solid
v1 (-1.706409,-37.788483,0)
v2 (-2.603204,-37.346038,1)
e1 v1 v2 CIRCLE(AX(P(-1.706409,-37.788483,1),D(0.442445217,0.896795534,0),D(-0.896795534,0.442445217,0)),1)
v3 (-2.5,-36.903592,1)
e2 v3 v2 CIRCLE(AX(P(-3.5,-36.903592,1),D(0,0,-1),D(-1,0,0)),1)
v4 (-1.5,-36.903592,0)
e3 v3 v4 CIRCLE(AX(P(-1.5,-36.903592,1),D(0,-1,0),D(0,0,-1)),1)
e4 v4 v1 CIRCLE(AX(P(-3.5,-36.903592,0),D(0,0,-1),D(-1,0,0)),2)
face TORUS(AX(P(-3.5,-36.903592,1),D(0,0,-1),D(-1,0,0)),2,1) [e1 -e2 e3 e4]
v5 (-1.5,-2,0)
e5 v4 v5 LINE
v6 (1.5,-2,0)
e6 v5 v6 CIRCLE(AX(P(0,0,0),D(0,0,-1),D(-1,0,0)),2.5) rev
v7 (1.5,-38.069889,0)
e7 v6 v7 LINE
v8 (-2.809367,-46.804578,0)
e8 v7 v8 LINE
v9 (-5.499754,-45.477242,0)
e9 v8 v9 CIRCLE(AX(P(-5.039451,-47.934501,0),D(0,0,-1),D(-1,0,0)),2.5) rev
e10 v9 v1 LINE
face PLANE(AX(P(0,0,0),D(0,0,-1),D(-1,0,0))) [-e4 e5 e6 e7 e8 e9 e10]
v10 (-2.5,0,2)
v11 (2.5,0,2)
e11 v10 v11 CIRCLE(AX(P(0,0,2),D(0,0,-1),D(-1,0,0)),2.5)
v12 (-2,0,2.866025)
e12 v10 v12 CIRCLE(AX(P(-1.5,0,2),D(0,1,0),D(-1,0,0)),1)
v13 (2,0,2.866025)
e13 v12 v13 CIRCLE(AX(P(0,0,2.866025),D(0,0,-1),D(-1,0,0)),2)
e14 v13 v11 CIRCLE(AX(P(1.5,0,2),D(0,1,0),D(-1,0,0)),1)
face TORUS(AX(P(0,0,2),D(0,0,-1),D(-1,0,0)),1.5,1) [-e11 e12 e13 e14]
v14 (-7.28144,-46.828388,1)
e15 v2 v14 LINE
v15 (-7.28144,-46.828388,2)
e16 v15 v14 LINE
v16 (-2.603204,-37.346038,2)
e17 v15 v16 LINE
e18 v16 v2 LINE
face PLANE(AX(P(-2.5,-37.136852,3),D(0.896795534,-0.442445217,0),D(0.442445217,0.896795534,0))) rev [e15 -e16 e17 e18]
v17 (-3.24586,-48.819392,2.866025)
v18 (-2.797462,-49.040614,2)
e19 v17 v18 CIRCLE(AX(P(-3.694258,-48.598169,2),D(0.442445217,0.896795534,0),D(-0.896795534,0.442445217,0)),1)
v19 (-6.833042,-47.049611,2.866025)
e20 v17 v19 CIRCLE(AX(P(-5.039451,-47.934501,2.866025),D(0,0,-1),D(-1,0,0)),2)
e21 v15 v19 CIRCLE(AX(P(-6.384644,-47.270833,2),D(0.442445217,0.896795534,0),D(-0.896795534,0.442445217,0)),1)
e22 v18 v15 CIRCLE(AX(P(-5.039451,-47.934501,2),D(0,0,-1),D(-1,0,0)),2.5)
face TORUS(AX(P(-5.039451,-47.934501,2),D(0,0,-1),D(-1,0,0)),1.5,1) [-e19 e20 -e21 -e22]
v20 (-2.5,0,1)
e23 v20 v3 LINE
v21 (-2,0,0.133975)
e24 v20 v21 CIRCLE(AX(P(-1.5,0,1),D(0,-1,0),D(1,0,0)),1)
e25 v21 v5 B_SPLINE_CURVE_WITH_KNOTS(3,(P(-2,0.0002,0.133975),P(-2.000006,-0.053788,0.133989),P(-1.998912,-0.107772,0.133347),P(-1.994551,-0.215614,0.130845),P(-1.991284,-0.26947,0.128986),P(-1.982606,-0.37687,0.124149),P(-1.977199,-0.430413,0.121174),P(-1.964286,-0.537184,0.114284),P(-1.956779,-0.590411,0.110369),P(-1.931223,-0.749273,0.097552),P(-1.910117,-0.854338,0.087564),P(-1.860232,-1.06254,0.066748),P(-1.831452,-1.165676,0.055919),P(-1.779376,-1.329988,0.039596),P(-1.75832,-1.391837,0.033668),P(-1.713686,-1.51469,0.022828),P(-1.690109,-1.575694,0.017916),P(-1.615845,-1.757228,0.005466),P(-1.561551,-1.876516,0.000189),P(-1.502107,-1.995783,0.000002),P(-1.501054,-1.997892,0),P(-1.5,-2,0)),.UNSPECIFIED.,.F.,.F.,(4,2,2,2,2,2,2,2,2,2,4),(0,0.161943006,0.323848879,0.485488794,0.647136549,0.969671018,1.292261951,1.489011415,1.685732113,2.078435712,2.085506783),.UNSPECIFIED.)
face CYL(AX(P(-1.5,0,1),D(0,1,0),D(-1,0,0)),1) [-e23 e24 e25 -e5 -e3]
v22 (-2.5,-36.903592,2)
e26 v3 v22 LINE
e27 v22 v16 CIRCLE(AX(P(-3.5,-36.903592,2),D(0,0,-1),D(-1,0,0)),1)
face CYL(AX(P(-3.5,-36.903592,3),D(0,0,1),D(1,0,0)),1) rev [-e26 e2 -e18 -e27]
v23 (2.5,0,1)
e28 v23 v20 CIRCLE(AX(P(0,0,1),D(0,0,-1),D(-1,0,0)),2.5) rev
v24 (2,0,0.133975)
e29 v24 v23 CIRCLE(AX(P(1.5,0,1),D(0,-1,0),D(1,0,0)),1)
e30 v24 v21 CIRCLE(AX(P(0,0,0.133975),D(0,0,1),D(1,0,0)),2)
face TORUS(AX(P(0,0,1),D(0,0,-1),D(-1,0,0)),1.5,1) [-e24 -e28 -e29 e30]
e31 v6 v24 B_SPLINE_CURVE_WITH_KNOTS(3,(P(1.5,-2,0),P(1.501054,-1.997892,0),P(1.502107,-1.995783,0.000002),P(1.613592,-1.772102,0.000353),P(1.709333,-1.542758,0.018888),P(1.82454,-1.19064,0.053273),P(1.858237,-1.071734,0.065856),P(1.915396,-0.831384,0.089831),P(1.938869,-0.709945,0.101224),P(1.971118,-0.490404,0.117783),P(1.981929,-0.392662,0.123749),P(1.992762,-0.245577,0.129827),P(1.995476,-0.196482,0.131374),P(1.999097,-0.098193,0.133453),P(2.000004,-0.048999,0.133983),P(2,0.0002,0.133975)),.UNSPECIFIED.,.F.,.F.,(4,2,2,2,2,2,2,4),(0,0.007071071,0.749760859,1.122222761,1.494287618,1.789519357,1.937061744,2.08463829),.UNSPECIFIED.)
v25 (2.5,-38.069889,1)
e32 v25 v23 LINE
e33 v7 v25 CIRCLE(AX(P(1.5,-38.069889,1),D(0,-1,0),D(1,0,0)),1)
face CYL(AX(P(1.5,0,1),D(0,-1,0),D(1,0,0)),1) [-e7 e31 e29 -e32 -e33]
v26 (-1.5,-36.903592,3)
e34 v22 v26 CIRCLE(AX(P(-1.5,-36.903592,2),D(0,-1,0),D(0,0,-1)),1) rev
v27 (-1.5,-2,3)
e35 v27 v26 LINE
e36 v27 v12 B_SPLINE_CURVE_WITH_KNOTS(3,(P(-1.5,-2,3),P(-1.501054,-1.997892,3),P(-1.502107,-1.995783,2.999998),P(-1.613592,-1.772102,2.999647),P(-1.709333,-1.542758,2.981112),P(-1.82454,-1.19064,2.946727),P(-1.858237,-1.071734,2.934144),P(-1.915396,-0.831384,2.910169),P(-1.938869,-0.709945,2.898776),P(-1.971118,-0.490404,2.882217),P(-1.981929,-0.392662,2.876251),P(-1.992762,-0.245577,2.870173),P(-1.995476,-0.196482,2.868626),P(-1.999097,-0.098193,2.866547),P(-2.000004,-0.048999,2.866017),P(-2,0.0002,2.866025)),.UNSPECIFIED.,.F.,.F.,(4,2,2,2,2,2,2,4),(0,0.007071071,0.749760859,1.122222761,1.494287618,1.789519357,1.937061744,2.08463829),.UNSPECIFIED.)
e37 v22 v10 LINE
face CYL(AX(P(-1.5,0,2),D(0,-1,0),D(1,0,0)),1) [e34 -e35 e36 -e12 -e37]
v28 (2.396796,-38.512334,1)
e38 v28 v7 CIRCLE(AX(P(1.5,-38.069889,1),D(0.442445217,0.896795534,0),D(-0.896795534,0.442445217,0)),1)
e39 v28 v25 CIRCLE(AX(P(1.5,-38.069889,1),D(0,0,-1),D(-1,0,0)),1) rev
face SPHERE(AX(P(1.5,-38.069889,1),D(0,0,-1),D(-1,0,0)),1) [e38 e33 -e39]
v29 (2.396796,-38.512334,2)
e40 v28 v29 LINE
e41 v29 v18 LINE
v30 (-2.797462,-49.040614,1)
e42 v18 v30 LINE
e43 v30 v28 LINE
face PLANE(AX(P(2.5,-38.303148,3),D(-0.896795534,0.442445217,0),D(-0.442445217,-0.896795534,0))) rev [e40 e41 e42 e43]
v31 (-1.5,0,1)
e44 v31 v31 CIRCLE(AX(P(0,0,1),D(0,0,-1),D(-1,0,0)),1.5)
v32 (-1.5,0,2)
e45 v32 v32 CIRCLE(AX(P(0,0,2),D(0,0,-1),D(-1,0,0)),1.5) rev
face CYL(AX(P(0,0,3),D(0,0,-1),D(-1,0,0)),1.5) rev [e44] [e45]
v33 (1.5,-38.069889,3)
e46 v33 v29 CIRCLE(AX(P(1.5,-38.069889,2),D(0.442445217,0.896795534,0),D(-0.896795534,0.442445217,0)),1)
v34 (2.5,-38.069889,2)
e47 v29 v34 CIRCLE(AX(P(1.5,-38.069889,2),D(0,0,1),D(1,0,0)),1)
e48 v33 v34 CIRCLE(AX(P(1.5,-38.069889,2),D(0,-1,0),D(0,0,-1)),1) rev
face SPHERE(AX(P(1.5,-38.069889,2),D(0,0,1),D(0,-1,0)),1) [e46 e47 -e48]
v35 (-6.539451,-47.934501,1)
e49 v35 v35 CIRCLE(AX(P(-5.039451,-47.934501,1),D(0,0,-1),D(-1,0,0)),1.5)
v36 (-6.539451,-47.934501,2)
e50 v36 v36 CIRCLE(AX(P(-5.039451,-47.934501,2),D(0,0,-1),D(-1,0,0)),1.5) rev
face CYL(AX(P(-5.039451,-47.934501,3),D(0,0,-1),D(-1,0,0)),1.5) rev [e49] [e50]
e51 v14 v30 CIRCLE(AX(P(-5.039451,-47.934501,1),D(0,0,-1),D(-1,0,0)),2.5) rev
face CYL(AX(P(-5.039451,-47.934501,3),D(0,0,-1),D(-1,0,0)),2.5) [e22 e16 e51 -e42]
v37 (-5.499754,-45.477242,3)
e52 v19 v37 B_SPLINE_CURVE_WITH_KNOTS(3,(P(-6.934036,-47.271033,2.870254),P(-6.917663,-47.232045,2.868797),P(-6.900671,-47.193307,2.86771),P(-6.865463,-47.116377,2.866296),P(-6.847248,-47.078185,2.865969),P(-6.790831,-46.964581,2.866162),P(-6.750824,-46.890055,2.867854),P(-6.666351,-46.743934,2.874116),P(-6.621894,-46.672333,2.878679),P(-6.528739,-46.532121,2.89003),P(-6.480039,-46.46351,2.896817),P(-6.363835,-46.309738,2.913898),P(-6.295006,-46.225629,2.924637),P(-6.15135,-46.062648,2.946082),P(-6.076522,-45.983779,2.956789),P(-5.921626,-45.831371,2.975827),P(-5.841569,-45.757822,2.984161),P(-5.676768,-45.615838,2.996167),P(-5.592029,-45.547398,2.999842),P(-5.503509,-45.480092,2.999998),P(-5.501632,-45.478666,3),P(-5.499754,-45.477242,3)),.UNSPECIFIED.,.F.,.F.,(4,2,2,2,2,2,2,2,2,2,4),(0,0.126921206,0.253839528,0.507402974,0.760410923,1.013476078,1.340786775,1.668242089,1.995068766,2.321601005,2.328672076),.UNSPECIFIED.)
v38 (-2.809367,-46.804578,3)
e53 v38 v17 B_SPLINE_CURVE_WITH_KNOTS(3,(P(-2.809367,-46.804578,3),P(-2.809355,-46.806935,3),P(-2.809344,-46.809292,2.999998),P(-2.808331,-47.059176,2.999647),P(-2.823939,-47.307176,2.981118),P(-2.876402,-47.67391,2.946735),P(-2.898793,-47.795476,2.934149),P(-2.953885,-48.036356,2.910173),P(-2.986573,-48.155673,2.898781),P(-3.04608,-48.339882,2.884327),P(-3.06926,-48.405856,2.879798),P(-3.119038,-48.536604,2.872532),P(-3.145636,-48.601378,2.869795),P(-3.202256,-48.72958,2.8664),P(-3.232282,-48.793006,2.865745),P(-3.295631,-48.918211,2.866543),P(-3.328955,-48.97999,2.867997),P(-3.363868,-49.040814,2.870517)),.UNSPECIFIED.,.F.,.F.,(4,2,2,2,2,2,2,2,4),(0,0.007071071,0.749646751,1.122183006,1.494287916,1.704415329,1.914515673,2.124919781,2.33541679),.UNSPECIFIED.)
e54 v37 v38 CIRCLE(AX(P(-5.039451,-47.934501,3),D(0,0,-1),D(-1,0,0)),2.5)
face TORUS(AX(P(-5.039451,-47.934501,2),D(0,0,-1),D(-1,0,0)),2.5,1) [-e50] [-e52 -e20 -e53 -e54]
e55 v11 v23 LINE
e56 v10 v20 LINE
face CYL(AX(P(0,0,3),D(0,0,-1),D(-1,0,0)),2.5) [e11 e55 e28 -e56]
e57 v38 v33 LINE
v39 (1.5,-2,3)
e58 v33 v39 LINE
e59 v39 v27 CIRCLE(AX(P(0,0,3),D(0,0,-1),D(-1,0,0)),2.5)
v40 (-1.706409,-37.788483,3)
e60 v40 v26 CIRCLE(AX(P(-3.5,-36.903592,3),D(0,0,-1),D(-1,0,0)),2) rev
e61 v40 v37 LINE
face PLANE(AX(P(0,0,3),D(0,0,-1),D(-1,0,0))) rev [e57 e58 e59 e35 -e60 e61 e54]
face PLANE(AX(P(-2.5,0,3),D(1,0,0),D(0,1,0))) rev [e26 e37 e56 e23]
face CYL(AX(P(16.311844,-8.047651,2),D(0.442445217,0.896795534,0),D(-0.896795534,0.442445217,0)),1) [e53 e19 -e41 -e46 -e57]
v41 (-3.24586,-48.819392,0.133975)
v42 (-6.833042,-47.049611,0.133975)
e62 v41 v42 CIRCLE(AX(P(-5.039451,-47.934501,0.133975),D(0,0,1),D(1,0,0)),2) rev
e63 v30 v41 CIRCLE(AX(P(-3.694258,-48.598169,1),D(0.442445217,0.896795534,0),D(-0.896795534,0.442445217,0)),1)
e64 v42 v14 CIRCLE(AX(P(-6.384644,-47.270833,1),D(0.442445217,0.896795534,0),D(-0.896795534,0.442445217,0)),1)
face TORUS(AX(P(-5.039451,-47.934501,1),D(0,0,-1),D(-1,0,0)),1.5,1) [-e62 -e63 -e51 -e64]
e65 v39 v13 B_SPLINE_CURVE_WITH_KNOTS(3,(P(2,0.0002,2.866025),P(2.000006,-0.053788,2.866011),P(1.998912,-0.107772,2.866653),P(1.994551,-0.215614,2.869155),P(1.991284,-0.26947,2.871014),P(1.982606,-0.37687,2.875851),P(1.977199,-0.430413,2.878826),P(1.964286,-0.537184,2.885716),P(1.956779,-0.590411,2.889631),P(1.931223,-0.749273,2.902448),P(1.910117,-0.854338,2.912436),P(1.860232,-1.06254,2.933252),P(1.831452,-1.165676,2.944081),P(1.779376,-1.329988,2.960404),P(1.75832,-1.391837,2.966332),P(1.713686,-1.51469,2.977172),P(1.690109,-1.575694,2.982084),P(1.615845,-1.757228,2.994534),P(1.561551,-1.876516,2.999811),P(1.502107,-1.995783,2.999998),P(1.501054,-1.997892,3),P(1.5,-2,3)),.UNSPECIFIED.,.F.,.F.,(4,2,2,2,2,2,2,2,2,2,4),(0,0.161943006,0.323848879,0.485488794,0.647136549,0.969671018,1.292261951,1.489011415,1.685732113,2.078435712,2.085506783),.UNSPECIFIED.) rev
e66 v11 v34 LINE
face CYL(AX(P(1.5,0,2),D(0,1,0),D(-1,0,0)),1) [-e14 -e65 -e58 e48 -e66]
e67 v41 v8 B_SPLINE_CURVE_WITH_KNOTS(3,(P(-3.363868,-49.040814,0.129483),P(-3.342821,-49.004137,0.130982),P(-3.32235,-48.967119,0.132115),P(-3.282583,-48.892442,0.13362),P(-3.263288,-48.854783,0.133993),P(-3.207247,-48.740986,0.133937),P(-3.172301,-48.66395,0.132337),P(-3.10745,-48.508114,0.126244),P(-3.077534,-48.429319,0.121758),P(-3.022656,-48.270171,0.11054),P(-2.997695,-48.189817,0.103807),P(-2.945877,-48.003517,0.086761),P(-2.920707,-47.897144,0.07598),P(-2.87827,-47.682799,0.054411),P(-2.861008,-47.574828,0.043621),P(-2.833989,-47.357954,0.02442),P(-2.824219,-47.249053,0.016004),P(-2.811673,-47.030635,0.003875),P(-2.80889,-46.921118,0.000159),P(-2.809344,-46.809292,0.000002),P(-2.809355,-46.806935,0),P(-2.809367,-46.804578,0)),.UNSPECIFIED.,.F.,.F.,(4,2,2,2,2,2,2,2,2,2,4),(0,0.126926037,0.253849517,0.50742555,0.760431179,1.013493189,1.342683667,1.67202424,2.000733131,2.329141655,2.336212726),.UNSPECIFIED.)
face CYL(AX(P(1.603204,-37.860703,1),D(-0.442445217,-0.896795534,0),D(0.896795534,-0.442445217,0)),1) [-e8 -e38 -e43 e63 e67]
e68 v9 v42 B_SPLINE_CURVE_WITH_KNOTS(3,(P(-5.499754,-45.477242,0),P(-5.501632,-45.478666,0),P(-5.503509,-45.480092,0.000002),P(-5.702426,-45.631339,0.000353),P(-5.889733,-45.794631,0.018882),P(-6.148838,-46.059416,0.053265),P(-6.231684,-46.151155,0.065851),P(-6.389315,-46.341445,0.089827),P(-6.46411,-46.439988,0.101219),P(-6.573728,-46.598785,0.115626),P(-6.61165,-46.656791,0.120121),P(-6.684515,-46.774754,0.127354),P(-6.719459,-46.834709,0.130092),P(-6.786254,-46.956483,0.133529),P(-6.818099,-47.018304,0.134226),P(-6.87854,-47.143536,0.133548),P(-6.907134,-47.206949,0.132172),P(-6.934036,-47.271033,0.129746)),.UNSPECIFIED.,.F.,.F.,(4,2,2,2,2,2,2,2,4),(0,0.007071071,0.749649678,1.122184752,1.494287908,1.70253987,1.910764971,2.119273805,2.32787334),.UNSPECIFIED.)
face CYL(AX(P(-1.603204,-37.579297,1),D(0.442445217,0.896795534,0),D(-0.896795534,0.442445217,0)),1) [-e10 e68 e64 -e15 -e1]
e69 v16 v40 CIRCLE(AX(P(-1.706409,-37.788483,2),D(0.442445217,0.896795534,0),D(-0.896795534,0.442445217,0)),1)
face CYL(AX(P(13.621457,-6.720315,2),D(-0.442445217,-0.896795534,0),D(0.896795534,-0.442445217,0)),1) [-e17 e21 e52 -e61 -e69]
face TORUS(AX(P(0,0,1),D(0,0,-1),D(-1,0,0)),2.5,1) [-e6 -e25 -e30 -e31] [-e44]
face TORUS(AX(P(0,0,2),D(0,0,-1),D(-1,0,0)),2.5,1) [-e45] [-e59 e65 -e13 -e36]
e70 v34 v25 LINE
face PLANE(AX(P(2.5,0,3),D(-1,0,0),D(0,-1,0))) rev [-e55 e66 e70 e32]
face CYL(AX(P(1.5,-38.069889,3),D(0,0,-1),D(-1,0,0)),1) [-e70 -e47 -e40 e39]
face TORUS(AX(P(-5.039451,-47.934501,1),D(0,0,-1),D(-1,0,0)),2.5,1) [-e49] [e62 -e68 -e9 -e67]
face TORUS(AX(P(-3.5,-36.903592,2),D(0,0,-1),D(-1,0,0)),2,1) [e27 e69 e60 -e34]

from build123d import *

# Parameters (mm, degrees)
SKETCH1_R           = 1.5
BOSS_EXTRUDE1_DEPTH = 3
FILLET1_R           = 1


with BuildPart() as part:
    # Sketch1 → Boss-Extrude1 (new body)
    with BuildSketch(Plane.XY):
        with BuildLine():
            Line((-2.5, 0), (-2.5, -37.136851725))
            Line((-2.5, -37.136851725), (-7.28143986, -46.828388088))
            ThreePointArc((-7.28143986, -46.828388088), (-6.145564068, -50.176489966), (-2.79746219, -49.040614175))
            Line((-2.79746219, -49.040614175), (2.5, -38.303148275))
            Line((2.5, -38.303148275), (2.5, 0))
            ThreePointArc((2.5, 0), (0, 2.5), (-2.5, 0))
        make_face()
        Circle(SKETCH1_R, mode=Mode.SUBTRACT)
        with Locations((-5.039451025, -47.934501132)):
            Circle(SKETCH1_R, mode=Mode.SUBTRACT)
    extrude(amount=BOSS_EXTRUDE1_DEPTH)

    # Fillet1
    # the kernel refuses this fillet: 1 mm, written as the material it adds along each edge
    with BuildSketch(Plane(origin=(-2.5, -37.136851725, 0), x_dir=(0, 1, 0), z_dir=(0, 0, 1))) as fillet1_piece_1:
        with BuildLine():
            CenterArc((FILLET1_R * 0.23325930992, FILLET1_R), FILLET1_R, 243.74, 26.26)
            Line((-FILLET1_R * 0.209185907385, FILLET1_R * 0.103204466066), (0, 0))
            Line((0, 0), (FILLET1_R * 0.23325930992, 0))
        make_face()
    extrude(amount=3)
    # the kernel refuses this fillet: 1 mm, written as the material it takes off along each edge
    with BuildSketch(Plane(origin=(1.5, -38.069888965, 2), x_dir=(0.8967955339340403, -0.44244521730487674, 0), z_dir=(0, 0, 1))) as fillet1_2_piece_1_section:
        Polygon((0, 0), (FILLET1_R, 0), (FILLET1_R, FILLET1_R * 0.23325930992), (FILLET1_R * 0.896795533934, FILLET1_R * 0.442445217305), align=None)
    fillet1_2_piece_1 = extrude(amount=FILLET1_R, mode=Mode.PRIVATE)
    fillet1_2_piece_1 = fillet1_2_piece_1 - Plane(origin=(1.5, -38.069888965, 2), x_dir=(-0.9738571594268947, 0.22716124896861223, 0), z_dir=(0, 0, 1)) * Sphere(FILLET1_R, mode=Mode.PRIVATE)
    add(fillet1_2_piece_1, mode=Mode.SUBTRACT)
    with BuildSketch(Plane(origin=(1.5, -38.069888965, 1), x_dir=(0.8967955339340403, -0.44244521730487674, 0), z_dir=(0, 0, -1))) as fillet1_2_piece_2_section:
        Polygon((0, 0), (FILLET1_R, 0), (FILLET1_R, -FILLET1_R * 0.23325930992), (FILLET1_R * 0.896795533934, -FILLET1_R * 0.442445217305), align=None)
    fillet1_2_piece_2 = extrude(amount=FILLET1_R, mode=Mode.PRIVATE)
    fillet1_2_piece_2 = fillet1_2_piece_2 - Plane(origin=(1.5, -38.069888965, 1), x_dir=(-0.9738571594268947, 0.22716124896861223, 0), z_dir=(0, 0, -1)) * Sphere(FILLET1_R, mode=Mode.PRIVATE)
    add(fillet1_2_piece_2, mode=Mode.SUBTRACT)
    with BuildSketch(Plane(origin=(0, 0, 3), x_dir=(1, 0, 0), z_dir=(0, -1, 0))) as fillet1_2_piece_3:
        with BuildLine():
            CenterArc((2.5 - FILLET1_R, -FILLET1_R), FILLET1_R, 0, 90)
            Line((2.5, -FILLET1_R), (2.5, 0))
            Line((2.5, 0), (2.5 - FILLET1_R, 0))
        make_face()
    revolve(axis=Axis((0, 0, 3), (0, 0, 1)), revolution_arc=180, mode=Mode.SUBTRACT)
    with BuildSketch(Plane(origin=(0, 0, 0), x_dir=(1, 0, 0), z_dir=(0, -1, 0))) as fillet1_2_piece_4:
        with BuildLine():
            CenterArc((2.5 - FILLET1_R, FILLET1_R), FILLET1_R, 270, 90)
            Line((2.5, FILLET1_R), (2.5, 0))
            Line((2.5, 0), (2.5 - FILLET1_R, 0))
        make_face()
    revolve(axis=Axis((0, 0, 0), (0, 0, 1)), revolution_arc=180, mode=Mode.SUBTRACT)
    with BuildSketch(Plane(origin=(-2.5, 0, 3), x_dir=(0, 0, -1), z_dir=(0, -1, 0))) as fillet1_2_piece_5:
        with BuildLine():
            CenterArc((FILLET1_R, FILLET1_R), FILLET1_R, 180, 90)
            Line((0, FILLET1_R), (0, 0))
            Line((0, 0), (FILLET1_R, 0))
        make_face()
    extrude(amount=36.903592415, mode=Mode.SUBTRACT)
    with BuildSketch(Plane(origin=(-2.5, 0, 0), x_dir=(0, 0, 1), z_dir=(0, -1, 0))) as fillet1_2_piece_6:
        with BuildLine():
            CenterArc((FILLET1_R, -FILLET1_R), FILLET1_R, 90, 90)
            Line((0, -FILLET1_R), (0, 0))
            Line((0, 0), (FILLET1_R, 0))
        make_face()
    extrude(amount=36.903592415, mode=Mode.SUBTRACT)
    with BuildSketch(Plane(origin=(-2.603204466, -37.346037633, 3), x_dir=(0.8967955339340403, -0.4424452173048767, 0), z_dir=(-0.4424452173048767, -0.8967955339340403, 0))) as fillet1_2_piece_7:
        with BuildLine():
            CenterArc((FILLET1_R, -FILLET1_R), FILLET1_R, 90, 90)
            Line((0, -FILLET1_R), (0, 0))
            Line((0, 0), (FILLET1_R, 0))
        make_face()
    extrude(amount=10.573592415, mode=Mode.SUBTRACT)
    with BuildSketch(Plane(origin=(-2.603204466, -37.346037633, 0), x_dir=(0.8967955339340403, -0.4424452173048767, 0), z_dir=(-0.4424452173048767, -0.8967955339340403, 0))) as fillet1_2_piece_8:
        with BuildLine():
            CenterArc((FILLET1_R, FILLET1_R), FILLET1_R, 180, 90)
            Line((0, FILLET1_R), (0, 0))
            Line((0, 0), (FILLET1_R, 0))
        make_face()
    extrude(amount=10.573592415, mode=Mode.SUBTRACT)
    with BuildSketch(Plane(origin=(-5.039451025, -47.934501132, 3), x_dir=(-0.8967955339340404, 0.44244521730487624, 0), z_dir=(0.44244521730487624, 0.8967955339340404, 0))) as fillet1_2_piece_9:
        with BuildLine():
            CenterArc((2.5 - FILLET1_R, -FILLET1_R), FILLET1_R, 0, 90)
            Line((2.5, -FILLET1_R), (2.5, 0))
            Line((2.5, 0), (2.5 - FILLET1_R, 0))
        make_face()
    revolve(axis=Axis((-5.039451025, -47.934501132, 3), (0, 0, 1)), revolution_arc=180, mode=Mode.SUBTRACT)
    with BuildSketch(Plane(origin=(-5.039451025, -47.934501132, 0), x_dir=(-0.8967955339340404, 0.44244521730487624, 0), z_dir=(0.44244521730487624, 0.8967955339340404, 0))) as fillet1_2_piece_10:
        with BuildLine():
            CenterArc((2.5 - FILLET1_R, FILLET1_R), FILLET1_R, 270, 90)
            Line((2.5, FILLET1_R), (2.5, 0))
            Line((2.5, 0), (2.5 - FILLET1_R, 0))
        make_face()
    revolve(axis=Axis((-5.039451025, -47.934501132, 0), (0, 0, 1)), revolution_arc=180, mode=Mode.SUBTRACT)
    with BuildSketch(Plane(origin=(-2.79746219, -49.040614175, 3), x_dir=(-0.8967955339340403, 0.44244521730487674, 0), z_dir=(0.44244521730487674, 0.8967955339340403, 0))) as fillet1_2_piece_11:
        with BuildLine():
            CenterArc((FILLET1_R, -FILLET1_R), FILLET1_R, 90, 90)
            Line((0, -FILLET1_R), (0, 0))
            Line((0, 0), (FILLET1_R, 0))
        make_face()
    extrude(amount=11.739888965, mode=Mode.SUBTRACT)
    with BuildSketch(Plane(origin=(-2.79746219, -49.040614175, 0), x_dir=(-0.8967955339340403, 0.44244521730487674, 0), z_dir=(0.44244521730487674, 0.8967955339340403, 0))) as fillet1_2_piece_12:
        with BuildLine():
            CenterArc((FILLET1_R, FILLET1_R), FILLET1_R, 180, 90)
            Line((0, FILLET1_R), (0, 0))
            Line((0, 0), (FILLET1_R, 0))
        make_face()
    extrude(amount=11.739888965, mode=Mode.SUBTRACT)
    with BuildSketch(Plane(origin=(2.5, -38.303148275, 1), x_dir=(-0.4424452173048793, -0.896795533934039, 0), z_dir=(0, 0, 1))) as fillet1_2_piece_13:
        with BuildLine():
            CenterArc((FILLET1_R * 0.23325930992, -FILLET1_R), FILLET1_R, 90, 26.26)
            Line((-FILLET1_R * 0.209185907385, -FILLET1_R * 0.103204466066), (0, 0))
            Line((0, 0), (FILLET1_R * 0.23325930992, 0))
        make_face()
    extrude(amount=1, mode=Mode.SUBTRACT)
    with BuildSketch(Plane(origin=(2.5, -38.069888965, 3), x_dir=(-1, 0, 0), z_dir=(0, 1, 0))) as fillet1_2_piece_14:
        with BuildLine():
            CenterArc((FILLET1_R, -FILLET1_R), FILLET1_R, 90, 90)
            Line((0, -FILLET1_R), (0, 0))
            Line((0, 0), (FILLET1_R, 0))
        make_face()
    extrude(amount=38.069888965, mode=Mode.SUBTRACT)
    with BuildSketch(Plane(origin=(2.5, -38.069888965, 0), x_dir=(-1, 0, 0), z_dir=(0, 1, 0))) as fillet1_2_piece_15:
        with BuildLine():
            CenterArc((FILLET1_R, FILLET1_R), FILLET1_R, 180, 90)
            Line((0, FILLET1_R), (0, 0))
            Line((0, 0), (FILLET1_R, 0))
        make_face()
    extrude(amount=38.069888965, mode=Mode.SUBTRACT)
    with BuildSketch(Plane(origin=(0, 0, 0), x_dir=(1, 0, 0), z_dir=(0, -1, 0))) as fillet1_2_piece_16:
        with BuildLine():
            CenterArc((1.5 + FILLET1_R, FILLET1_R), FILLET1_R, 180, 90)
            Line((1.5, FILLET1_R), (1.5, 0))
            Line((1.5, 0), (1.5 + FILLET1_R, 0))
        make_face()
    revolve(axis=Axis((0, 0, 0), (0, 0, 1)), mode=Mode.SUBTRACT)
    with BuildSketch(Plane(origin=(0, 0, 3), x_dir=(1, 0, 0), z_dir=(0, -1, 0))) as fillet1_2_piece_17:
        with BuildLine():
            CenterArc((1.5 + FILLET1_R, -FILLET1_R), FILLET1_R, 90, 90)
            Line((1.5, -FILLET1_R), (1.5, 0))
            Line((1.5, 0), (1.5 + FILLET1_R, 0))
        make_face()
    revolve(axis=Axis((0, 0, 3), (0, 0, 1)), mode=Mode.SUBTRACT)
    with BuildSketch(Plane(origin=(-5.039451025, -47.934501132, 0), x_dir=(1, 0, 0), z_dir=(0, -1, 0))) as fillet1_2_piece_18:
        with BuildLine():
            CenterArc((1.5 + FILLET1_R, FILLET1_R), FILLET1_R, 180, 90)
            Line((1.5, FILLET1_R), (1.5, 0))
            Line((1.5, 0), (1.5 + FILLET1_R, 0))
        make_face()
    revolve(axis=Axis((-5.039451025, -47.934501132, 0), (0, 0, 1)), mode=Mode.SUBTRACT)
    with BuildSketch(Plane(origin=(-5.039451025, -47.934501132, 3), x_dir=(1, 0, 0), z_dir=(0, -1, 0))) as fillet1_2_piece_19:
        with BuildLine():
            CenterArc((1.5 + FILLET1_R, -FILLET1_R), FILLET1_R, 90, 90)
            Line((1.5, -FILLET1_R), (1.5, 0))
            Line((1.5, 0), (1.5 + FILLET1_R, 0))
        make_face()
    revolve(axis=Axis((-5.039451025, -47.934501132, 3), (0, 0, 1)), mode=Mode.SUBTRACT)
    with BuildSketch(Plane(origin=(-3.5, -36.903592415, 0), x_dir=(1, 0, 0), z_dir=(0, 1, 0))) as fillet1_2_piece_20:
        with BuildLine():
            CenterArc((1 + FILLET1_R, -FILLET1_R), FILLET1_R, 90, 90)
            Line((1, -FILLET1_R), (1, 0))
            Line((1, 0), (1 + FILLET1_R, 0))
        make_face()
    revolve(axis=Axis((-3.5, -36.903592415, 0), (0, 0, -1)), revolution_arc=26.26, mode=Mode.SUBTRACT)
    with BuildSketch(Plane(origin=(-3.5, -36.903592415, 3), x_dir=(1, 0, 0), z_dir=(0, 1, 0))) as fillet1_2_piece_21:
        with BuildLine():
            CenterArc((1 + FILLET1_R, FILLET1_R), FILLET1_R, 180, 90)
            Line((1 + FILLET1_R, 0), (1, 0))
            Line((1, 0), (1, FILLET1_R))
        make_face()
    revolve(axis=Axis((-3.5, -36.903592415, 3), (0, 0, -1)), revolution_arc=26.26, mode=Mode.SUBTRACT)


solid = part.part
